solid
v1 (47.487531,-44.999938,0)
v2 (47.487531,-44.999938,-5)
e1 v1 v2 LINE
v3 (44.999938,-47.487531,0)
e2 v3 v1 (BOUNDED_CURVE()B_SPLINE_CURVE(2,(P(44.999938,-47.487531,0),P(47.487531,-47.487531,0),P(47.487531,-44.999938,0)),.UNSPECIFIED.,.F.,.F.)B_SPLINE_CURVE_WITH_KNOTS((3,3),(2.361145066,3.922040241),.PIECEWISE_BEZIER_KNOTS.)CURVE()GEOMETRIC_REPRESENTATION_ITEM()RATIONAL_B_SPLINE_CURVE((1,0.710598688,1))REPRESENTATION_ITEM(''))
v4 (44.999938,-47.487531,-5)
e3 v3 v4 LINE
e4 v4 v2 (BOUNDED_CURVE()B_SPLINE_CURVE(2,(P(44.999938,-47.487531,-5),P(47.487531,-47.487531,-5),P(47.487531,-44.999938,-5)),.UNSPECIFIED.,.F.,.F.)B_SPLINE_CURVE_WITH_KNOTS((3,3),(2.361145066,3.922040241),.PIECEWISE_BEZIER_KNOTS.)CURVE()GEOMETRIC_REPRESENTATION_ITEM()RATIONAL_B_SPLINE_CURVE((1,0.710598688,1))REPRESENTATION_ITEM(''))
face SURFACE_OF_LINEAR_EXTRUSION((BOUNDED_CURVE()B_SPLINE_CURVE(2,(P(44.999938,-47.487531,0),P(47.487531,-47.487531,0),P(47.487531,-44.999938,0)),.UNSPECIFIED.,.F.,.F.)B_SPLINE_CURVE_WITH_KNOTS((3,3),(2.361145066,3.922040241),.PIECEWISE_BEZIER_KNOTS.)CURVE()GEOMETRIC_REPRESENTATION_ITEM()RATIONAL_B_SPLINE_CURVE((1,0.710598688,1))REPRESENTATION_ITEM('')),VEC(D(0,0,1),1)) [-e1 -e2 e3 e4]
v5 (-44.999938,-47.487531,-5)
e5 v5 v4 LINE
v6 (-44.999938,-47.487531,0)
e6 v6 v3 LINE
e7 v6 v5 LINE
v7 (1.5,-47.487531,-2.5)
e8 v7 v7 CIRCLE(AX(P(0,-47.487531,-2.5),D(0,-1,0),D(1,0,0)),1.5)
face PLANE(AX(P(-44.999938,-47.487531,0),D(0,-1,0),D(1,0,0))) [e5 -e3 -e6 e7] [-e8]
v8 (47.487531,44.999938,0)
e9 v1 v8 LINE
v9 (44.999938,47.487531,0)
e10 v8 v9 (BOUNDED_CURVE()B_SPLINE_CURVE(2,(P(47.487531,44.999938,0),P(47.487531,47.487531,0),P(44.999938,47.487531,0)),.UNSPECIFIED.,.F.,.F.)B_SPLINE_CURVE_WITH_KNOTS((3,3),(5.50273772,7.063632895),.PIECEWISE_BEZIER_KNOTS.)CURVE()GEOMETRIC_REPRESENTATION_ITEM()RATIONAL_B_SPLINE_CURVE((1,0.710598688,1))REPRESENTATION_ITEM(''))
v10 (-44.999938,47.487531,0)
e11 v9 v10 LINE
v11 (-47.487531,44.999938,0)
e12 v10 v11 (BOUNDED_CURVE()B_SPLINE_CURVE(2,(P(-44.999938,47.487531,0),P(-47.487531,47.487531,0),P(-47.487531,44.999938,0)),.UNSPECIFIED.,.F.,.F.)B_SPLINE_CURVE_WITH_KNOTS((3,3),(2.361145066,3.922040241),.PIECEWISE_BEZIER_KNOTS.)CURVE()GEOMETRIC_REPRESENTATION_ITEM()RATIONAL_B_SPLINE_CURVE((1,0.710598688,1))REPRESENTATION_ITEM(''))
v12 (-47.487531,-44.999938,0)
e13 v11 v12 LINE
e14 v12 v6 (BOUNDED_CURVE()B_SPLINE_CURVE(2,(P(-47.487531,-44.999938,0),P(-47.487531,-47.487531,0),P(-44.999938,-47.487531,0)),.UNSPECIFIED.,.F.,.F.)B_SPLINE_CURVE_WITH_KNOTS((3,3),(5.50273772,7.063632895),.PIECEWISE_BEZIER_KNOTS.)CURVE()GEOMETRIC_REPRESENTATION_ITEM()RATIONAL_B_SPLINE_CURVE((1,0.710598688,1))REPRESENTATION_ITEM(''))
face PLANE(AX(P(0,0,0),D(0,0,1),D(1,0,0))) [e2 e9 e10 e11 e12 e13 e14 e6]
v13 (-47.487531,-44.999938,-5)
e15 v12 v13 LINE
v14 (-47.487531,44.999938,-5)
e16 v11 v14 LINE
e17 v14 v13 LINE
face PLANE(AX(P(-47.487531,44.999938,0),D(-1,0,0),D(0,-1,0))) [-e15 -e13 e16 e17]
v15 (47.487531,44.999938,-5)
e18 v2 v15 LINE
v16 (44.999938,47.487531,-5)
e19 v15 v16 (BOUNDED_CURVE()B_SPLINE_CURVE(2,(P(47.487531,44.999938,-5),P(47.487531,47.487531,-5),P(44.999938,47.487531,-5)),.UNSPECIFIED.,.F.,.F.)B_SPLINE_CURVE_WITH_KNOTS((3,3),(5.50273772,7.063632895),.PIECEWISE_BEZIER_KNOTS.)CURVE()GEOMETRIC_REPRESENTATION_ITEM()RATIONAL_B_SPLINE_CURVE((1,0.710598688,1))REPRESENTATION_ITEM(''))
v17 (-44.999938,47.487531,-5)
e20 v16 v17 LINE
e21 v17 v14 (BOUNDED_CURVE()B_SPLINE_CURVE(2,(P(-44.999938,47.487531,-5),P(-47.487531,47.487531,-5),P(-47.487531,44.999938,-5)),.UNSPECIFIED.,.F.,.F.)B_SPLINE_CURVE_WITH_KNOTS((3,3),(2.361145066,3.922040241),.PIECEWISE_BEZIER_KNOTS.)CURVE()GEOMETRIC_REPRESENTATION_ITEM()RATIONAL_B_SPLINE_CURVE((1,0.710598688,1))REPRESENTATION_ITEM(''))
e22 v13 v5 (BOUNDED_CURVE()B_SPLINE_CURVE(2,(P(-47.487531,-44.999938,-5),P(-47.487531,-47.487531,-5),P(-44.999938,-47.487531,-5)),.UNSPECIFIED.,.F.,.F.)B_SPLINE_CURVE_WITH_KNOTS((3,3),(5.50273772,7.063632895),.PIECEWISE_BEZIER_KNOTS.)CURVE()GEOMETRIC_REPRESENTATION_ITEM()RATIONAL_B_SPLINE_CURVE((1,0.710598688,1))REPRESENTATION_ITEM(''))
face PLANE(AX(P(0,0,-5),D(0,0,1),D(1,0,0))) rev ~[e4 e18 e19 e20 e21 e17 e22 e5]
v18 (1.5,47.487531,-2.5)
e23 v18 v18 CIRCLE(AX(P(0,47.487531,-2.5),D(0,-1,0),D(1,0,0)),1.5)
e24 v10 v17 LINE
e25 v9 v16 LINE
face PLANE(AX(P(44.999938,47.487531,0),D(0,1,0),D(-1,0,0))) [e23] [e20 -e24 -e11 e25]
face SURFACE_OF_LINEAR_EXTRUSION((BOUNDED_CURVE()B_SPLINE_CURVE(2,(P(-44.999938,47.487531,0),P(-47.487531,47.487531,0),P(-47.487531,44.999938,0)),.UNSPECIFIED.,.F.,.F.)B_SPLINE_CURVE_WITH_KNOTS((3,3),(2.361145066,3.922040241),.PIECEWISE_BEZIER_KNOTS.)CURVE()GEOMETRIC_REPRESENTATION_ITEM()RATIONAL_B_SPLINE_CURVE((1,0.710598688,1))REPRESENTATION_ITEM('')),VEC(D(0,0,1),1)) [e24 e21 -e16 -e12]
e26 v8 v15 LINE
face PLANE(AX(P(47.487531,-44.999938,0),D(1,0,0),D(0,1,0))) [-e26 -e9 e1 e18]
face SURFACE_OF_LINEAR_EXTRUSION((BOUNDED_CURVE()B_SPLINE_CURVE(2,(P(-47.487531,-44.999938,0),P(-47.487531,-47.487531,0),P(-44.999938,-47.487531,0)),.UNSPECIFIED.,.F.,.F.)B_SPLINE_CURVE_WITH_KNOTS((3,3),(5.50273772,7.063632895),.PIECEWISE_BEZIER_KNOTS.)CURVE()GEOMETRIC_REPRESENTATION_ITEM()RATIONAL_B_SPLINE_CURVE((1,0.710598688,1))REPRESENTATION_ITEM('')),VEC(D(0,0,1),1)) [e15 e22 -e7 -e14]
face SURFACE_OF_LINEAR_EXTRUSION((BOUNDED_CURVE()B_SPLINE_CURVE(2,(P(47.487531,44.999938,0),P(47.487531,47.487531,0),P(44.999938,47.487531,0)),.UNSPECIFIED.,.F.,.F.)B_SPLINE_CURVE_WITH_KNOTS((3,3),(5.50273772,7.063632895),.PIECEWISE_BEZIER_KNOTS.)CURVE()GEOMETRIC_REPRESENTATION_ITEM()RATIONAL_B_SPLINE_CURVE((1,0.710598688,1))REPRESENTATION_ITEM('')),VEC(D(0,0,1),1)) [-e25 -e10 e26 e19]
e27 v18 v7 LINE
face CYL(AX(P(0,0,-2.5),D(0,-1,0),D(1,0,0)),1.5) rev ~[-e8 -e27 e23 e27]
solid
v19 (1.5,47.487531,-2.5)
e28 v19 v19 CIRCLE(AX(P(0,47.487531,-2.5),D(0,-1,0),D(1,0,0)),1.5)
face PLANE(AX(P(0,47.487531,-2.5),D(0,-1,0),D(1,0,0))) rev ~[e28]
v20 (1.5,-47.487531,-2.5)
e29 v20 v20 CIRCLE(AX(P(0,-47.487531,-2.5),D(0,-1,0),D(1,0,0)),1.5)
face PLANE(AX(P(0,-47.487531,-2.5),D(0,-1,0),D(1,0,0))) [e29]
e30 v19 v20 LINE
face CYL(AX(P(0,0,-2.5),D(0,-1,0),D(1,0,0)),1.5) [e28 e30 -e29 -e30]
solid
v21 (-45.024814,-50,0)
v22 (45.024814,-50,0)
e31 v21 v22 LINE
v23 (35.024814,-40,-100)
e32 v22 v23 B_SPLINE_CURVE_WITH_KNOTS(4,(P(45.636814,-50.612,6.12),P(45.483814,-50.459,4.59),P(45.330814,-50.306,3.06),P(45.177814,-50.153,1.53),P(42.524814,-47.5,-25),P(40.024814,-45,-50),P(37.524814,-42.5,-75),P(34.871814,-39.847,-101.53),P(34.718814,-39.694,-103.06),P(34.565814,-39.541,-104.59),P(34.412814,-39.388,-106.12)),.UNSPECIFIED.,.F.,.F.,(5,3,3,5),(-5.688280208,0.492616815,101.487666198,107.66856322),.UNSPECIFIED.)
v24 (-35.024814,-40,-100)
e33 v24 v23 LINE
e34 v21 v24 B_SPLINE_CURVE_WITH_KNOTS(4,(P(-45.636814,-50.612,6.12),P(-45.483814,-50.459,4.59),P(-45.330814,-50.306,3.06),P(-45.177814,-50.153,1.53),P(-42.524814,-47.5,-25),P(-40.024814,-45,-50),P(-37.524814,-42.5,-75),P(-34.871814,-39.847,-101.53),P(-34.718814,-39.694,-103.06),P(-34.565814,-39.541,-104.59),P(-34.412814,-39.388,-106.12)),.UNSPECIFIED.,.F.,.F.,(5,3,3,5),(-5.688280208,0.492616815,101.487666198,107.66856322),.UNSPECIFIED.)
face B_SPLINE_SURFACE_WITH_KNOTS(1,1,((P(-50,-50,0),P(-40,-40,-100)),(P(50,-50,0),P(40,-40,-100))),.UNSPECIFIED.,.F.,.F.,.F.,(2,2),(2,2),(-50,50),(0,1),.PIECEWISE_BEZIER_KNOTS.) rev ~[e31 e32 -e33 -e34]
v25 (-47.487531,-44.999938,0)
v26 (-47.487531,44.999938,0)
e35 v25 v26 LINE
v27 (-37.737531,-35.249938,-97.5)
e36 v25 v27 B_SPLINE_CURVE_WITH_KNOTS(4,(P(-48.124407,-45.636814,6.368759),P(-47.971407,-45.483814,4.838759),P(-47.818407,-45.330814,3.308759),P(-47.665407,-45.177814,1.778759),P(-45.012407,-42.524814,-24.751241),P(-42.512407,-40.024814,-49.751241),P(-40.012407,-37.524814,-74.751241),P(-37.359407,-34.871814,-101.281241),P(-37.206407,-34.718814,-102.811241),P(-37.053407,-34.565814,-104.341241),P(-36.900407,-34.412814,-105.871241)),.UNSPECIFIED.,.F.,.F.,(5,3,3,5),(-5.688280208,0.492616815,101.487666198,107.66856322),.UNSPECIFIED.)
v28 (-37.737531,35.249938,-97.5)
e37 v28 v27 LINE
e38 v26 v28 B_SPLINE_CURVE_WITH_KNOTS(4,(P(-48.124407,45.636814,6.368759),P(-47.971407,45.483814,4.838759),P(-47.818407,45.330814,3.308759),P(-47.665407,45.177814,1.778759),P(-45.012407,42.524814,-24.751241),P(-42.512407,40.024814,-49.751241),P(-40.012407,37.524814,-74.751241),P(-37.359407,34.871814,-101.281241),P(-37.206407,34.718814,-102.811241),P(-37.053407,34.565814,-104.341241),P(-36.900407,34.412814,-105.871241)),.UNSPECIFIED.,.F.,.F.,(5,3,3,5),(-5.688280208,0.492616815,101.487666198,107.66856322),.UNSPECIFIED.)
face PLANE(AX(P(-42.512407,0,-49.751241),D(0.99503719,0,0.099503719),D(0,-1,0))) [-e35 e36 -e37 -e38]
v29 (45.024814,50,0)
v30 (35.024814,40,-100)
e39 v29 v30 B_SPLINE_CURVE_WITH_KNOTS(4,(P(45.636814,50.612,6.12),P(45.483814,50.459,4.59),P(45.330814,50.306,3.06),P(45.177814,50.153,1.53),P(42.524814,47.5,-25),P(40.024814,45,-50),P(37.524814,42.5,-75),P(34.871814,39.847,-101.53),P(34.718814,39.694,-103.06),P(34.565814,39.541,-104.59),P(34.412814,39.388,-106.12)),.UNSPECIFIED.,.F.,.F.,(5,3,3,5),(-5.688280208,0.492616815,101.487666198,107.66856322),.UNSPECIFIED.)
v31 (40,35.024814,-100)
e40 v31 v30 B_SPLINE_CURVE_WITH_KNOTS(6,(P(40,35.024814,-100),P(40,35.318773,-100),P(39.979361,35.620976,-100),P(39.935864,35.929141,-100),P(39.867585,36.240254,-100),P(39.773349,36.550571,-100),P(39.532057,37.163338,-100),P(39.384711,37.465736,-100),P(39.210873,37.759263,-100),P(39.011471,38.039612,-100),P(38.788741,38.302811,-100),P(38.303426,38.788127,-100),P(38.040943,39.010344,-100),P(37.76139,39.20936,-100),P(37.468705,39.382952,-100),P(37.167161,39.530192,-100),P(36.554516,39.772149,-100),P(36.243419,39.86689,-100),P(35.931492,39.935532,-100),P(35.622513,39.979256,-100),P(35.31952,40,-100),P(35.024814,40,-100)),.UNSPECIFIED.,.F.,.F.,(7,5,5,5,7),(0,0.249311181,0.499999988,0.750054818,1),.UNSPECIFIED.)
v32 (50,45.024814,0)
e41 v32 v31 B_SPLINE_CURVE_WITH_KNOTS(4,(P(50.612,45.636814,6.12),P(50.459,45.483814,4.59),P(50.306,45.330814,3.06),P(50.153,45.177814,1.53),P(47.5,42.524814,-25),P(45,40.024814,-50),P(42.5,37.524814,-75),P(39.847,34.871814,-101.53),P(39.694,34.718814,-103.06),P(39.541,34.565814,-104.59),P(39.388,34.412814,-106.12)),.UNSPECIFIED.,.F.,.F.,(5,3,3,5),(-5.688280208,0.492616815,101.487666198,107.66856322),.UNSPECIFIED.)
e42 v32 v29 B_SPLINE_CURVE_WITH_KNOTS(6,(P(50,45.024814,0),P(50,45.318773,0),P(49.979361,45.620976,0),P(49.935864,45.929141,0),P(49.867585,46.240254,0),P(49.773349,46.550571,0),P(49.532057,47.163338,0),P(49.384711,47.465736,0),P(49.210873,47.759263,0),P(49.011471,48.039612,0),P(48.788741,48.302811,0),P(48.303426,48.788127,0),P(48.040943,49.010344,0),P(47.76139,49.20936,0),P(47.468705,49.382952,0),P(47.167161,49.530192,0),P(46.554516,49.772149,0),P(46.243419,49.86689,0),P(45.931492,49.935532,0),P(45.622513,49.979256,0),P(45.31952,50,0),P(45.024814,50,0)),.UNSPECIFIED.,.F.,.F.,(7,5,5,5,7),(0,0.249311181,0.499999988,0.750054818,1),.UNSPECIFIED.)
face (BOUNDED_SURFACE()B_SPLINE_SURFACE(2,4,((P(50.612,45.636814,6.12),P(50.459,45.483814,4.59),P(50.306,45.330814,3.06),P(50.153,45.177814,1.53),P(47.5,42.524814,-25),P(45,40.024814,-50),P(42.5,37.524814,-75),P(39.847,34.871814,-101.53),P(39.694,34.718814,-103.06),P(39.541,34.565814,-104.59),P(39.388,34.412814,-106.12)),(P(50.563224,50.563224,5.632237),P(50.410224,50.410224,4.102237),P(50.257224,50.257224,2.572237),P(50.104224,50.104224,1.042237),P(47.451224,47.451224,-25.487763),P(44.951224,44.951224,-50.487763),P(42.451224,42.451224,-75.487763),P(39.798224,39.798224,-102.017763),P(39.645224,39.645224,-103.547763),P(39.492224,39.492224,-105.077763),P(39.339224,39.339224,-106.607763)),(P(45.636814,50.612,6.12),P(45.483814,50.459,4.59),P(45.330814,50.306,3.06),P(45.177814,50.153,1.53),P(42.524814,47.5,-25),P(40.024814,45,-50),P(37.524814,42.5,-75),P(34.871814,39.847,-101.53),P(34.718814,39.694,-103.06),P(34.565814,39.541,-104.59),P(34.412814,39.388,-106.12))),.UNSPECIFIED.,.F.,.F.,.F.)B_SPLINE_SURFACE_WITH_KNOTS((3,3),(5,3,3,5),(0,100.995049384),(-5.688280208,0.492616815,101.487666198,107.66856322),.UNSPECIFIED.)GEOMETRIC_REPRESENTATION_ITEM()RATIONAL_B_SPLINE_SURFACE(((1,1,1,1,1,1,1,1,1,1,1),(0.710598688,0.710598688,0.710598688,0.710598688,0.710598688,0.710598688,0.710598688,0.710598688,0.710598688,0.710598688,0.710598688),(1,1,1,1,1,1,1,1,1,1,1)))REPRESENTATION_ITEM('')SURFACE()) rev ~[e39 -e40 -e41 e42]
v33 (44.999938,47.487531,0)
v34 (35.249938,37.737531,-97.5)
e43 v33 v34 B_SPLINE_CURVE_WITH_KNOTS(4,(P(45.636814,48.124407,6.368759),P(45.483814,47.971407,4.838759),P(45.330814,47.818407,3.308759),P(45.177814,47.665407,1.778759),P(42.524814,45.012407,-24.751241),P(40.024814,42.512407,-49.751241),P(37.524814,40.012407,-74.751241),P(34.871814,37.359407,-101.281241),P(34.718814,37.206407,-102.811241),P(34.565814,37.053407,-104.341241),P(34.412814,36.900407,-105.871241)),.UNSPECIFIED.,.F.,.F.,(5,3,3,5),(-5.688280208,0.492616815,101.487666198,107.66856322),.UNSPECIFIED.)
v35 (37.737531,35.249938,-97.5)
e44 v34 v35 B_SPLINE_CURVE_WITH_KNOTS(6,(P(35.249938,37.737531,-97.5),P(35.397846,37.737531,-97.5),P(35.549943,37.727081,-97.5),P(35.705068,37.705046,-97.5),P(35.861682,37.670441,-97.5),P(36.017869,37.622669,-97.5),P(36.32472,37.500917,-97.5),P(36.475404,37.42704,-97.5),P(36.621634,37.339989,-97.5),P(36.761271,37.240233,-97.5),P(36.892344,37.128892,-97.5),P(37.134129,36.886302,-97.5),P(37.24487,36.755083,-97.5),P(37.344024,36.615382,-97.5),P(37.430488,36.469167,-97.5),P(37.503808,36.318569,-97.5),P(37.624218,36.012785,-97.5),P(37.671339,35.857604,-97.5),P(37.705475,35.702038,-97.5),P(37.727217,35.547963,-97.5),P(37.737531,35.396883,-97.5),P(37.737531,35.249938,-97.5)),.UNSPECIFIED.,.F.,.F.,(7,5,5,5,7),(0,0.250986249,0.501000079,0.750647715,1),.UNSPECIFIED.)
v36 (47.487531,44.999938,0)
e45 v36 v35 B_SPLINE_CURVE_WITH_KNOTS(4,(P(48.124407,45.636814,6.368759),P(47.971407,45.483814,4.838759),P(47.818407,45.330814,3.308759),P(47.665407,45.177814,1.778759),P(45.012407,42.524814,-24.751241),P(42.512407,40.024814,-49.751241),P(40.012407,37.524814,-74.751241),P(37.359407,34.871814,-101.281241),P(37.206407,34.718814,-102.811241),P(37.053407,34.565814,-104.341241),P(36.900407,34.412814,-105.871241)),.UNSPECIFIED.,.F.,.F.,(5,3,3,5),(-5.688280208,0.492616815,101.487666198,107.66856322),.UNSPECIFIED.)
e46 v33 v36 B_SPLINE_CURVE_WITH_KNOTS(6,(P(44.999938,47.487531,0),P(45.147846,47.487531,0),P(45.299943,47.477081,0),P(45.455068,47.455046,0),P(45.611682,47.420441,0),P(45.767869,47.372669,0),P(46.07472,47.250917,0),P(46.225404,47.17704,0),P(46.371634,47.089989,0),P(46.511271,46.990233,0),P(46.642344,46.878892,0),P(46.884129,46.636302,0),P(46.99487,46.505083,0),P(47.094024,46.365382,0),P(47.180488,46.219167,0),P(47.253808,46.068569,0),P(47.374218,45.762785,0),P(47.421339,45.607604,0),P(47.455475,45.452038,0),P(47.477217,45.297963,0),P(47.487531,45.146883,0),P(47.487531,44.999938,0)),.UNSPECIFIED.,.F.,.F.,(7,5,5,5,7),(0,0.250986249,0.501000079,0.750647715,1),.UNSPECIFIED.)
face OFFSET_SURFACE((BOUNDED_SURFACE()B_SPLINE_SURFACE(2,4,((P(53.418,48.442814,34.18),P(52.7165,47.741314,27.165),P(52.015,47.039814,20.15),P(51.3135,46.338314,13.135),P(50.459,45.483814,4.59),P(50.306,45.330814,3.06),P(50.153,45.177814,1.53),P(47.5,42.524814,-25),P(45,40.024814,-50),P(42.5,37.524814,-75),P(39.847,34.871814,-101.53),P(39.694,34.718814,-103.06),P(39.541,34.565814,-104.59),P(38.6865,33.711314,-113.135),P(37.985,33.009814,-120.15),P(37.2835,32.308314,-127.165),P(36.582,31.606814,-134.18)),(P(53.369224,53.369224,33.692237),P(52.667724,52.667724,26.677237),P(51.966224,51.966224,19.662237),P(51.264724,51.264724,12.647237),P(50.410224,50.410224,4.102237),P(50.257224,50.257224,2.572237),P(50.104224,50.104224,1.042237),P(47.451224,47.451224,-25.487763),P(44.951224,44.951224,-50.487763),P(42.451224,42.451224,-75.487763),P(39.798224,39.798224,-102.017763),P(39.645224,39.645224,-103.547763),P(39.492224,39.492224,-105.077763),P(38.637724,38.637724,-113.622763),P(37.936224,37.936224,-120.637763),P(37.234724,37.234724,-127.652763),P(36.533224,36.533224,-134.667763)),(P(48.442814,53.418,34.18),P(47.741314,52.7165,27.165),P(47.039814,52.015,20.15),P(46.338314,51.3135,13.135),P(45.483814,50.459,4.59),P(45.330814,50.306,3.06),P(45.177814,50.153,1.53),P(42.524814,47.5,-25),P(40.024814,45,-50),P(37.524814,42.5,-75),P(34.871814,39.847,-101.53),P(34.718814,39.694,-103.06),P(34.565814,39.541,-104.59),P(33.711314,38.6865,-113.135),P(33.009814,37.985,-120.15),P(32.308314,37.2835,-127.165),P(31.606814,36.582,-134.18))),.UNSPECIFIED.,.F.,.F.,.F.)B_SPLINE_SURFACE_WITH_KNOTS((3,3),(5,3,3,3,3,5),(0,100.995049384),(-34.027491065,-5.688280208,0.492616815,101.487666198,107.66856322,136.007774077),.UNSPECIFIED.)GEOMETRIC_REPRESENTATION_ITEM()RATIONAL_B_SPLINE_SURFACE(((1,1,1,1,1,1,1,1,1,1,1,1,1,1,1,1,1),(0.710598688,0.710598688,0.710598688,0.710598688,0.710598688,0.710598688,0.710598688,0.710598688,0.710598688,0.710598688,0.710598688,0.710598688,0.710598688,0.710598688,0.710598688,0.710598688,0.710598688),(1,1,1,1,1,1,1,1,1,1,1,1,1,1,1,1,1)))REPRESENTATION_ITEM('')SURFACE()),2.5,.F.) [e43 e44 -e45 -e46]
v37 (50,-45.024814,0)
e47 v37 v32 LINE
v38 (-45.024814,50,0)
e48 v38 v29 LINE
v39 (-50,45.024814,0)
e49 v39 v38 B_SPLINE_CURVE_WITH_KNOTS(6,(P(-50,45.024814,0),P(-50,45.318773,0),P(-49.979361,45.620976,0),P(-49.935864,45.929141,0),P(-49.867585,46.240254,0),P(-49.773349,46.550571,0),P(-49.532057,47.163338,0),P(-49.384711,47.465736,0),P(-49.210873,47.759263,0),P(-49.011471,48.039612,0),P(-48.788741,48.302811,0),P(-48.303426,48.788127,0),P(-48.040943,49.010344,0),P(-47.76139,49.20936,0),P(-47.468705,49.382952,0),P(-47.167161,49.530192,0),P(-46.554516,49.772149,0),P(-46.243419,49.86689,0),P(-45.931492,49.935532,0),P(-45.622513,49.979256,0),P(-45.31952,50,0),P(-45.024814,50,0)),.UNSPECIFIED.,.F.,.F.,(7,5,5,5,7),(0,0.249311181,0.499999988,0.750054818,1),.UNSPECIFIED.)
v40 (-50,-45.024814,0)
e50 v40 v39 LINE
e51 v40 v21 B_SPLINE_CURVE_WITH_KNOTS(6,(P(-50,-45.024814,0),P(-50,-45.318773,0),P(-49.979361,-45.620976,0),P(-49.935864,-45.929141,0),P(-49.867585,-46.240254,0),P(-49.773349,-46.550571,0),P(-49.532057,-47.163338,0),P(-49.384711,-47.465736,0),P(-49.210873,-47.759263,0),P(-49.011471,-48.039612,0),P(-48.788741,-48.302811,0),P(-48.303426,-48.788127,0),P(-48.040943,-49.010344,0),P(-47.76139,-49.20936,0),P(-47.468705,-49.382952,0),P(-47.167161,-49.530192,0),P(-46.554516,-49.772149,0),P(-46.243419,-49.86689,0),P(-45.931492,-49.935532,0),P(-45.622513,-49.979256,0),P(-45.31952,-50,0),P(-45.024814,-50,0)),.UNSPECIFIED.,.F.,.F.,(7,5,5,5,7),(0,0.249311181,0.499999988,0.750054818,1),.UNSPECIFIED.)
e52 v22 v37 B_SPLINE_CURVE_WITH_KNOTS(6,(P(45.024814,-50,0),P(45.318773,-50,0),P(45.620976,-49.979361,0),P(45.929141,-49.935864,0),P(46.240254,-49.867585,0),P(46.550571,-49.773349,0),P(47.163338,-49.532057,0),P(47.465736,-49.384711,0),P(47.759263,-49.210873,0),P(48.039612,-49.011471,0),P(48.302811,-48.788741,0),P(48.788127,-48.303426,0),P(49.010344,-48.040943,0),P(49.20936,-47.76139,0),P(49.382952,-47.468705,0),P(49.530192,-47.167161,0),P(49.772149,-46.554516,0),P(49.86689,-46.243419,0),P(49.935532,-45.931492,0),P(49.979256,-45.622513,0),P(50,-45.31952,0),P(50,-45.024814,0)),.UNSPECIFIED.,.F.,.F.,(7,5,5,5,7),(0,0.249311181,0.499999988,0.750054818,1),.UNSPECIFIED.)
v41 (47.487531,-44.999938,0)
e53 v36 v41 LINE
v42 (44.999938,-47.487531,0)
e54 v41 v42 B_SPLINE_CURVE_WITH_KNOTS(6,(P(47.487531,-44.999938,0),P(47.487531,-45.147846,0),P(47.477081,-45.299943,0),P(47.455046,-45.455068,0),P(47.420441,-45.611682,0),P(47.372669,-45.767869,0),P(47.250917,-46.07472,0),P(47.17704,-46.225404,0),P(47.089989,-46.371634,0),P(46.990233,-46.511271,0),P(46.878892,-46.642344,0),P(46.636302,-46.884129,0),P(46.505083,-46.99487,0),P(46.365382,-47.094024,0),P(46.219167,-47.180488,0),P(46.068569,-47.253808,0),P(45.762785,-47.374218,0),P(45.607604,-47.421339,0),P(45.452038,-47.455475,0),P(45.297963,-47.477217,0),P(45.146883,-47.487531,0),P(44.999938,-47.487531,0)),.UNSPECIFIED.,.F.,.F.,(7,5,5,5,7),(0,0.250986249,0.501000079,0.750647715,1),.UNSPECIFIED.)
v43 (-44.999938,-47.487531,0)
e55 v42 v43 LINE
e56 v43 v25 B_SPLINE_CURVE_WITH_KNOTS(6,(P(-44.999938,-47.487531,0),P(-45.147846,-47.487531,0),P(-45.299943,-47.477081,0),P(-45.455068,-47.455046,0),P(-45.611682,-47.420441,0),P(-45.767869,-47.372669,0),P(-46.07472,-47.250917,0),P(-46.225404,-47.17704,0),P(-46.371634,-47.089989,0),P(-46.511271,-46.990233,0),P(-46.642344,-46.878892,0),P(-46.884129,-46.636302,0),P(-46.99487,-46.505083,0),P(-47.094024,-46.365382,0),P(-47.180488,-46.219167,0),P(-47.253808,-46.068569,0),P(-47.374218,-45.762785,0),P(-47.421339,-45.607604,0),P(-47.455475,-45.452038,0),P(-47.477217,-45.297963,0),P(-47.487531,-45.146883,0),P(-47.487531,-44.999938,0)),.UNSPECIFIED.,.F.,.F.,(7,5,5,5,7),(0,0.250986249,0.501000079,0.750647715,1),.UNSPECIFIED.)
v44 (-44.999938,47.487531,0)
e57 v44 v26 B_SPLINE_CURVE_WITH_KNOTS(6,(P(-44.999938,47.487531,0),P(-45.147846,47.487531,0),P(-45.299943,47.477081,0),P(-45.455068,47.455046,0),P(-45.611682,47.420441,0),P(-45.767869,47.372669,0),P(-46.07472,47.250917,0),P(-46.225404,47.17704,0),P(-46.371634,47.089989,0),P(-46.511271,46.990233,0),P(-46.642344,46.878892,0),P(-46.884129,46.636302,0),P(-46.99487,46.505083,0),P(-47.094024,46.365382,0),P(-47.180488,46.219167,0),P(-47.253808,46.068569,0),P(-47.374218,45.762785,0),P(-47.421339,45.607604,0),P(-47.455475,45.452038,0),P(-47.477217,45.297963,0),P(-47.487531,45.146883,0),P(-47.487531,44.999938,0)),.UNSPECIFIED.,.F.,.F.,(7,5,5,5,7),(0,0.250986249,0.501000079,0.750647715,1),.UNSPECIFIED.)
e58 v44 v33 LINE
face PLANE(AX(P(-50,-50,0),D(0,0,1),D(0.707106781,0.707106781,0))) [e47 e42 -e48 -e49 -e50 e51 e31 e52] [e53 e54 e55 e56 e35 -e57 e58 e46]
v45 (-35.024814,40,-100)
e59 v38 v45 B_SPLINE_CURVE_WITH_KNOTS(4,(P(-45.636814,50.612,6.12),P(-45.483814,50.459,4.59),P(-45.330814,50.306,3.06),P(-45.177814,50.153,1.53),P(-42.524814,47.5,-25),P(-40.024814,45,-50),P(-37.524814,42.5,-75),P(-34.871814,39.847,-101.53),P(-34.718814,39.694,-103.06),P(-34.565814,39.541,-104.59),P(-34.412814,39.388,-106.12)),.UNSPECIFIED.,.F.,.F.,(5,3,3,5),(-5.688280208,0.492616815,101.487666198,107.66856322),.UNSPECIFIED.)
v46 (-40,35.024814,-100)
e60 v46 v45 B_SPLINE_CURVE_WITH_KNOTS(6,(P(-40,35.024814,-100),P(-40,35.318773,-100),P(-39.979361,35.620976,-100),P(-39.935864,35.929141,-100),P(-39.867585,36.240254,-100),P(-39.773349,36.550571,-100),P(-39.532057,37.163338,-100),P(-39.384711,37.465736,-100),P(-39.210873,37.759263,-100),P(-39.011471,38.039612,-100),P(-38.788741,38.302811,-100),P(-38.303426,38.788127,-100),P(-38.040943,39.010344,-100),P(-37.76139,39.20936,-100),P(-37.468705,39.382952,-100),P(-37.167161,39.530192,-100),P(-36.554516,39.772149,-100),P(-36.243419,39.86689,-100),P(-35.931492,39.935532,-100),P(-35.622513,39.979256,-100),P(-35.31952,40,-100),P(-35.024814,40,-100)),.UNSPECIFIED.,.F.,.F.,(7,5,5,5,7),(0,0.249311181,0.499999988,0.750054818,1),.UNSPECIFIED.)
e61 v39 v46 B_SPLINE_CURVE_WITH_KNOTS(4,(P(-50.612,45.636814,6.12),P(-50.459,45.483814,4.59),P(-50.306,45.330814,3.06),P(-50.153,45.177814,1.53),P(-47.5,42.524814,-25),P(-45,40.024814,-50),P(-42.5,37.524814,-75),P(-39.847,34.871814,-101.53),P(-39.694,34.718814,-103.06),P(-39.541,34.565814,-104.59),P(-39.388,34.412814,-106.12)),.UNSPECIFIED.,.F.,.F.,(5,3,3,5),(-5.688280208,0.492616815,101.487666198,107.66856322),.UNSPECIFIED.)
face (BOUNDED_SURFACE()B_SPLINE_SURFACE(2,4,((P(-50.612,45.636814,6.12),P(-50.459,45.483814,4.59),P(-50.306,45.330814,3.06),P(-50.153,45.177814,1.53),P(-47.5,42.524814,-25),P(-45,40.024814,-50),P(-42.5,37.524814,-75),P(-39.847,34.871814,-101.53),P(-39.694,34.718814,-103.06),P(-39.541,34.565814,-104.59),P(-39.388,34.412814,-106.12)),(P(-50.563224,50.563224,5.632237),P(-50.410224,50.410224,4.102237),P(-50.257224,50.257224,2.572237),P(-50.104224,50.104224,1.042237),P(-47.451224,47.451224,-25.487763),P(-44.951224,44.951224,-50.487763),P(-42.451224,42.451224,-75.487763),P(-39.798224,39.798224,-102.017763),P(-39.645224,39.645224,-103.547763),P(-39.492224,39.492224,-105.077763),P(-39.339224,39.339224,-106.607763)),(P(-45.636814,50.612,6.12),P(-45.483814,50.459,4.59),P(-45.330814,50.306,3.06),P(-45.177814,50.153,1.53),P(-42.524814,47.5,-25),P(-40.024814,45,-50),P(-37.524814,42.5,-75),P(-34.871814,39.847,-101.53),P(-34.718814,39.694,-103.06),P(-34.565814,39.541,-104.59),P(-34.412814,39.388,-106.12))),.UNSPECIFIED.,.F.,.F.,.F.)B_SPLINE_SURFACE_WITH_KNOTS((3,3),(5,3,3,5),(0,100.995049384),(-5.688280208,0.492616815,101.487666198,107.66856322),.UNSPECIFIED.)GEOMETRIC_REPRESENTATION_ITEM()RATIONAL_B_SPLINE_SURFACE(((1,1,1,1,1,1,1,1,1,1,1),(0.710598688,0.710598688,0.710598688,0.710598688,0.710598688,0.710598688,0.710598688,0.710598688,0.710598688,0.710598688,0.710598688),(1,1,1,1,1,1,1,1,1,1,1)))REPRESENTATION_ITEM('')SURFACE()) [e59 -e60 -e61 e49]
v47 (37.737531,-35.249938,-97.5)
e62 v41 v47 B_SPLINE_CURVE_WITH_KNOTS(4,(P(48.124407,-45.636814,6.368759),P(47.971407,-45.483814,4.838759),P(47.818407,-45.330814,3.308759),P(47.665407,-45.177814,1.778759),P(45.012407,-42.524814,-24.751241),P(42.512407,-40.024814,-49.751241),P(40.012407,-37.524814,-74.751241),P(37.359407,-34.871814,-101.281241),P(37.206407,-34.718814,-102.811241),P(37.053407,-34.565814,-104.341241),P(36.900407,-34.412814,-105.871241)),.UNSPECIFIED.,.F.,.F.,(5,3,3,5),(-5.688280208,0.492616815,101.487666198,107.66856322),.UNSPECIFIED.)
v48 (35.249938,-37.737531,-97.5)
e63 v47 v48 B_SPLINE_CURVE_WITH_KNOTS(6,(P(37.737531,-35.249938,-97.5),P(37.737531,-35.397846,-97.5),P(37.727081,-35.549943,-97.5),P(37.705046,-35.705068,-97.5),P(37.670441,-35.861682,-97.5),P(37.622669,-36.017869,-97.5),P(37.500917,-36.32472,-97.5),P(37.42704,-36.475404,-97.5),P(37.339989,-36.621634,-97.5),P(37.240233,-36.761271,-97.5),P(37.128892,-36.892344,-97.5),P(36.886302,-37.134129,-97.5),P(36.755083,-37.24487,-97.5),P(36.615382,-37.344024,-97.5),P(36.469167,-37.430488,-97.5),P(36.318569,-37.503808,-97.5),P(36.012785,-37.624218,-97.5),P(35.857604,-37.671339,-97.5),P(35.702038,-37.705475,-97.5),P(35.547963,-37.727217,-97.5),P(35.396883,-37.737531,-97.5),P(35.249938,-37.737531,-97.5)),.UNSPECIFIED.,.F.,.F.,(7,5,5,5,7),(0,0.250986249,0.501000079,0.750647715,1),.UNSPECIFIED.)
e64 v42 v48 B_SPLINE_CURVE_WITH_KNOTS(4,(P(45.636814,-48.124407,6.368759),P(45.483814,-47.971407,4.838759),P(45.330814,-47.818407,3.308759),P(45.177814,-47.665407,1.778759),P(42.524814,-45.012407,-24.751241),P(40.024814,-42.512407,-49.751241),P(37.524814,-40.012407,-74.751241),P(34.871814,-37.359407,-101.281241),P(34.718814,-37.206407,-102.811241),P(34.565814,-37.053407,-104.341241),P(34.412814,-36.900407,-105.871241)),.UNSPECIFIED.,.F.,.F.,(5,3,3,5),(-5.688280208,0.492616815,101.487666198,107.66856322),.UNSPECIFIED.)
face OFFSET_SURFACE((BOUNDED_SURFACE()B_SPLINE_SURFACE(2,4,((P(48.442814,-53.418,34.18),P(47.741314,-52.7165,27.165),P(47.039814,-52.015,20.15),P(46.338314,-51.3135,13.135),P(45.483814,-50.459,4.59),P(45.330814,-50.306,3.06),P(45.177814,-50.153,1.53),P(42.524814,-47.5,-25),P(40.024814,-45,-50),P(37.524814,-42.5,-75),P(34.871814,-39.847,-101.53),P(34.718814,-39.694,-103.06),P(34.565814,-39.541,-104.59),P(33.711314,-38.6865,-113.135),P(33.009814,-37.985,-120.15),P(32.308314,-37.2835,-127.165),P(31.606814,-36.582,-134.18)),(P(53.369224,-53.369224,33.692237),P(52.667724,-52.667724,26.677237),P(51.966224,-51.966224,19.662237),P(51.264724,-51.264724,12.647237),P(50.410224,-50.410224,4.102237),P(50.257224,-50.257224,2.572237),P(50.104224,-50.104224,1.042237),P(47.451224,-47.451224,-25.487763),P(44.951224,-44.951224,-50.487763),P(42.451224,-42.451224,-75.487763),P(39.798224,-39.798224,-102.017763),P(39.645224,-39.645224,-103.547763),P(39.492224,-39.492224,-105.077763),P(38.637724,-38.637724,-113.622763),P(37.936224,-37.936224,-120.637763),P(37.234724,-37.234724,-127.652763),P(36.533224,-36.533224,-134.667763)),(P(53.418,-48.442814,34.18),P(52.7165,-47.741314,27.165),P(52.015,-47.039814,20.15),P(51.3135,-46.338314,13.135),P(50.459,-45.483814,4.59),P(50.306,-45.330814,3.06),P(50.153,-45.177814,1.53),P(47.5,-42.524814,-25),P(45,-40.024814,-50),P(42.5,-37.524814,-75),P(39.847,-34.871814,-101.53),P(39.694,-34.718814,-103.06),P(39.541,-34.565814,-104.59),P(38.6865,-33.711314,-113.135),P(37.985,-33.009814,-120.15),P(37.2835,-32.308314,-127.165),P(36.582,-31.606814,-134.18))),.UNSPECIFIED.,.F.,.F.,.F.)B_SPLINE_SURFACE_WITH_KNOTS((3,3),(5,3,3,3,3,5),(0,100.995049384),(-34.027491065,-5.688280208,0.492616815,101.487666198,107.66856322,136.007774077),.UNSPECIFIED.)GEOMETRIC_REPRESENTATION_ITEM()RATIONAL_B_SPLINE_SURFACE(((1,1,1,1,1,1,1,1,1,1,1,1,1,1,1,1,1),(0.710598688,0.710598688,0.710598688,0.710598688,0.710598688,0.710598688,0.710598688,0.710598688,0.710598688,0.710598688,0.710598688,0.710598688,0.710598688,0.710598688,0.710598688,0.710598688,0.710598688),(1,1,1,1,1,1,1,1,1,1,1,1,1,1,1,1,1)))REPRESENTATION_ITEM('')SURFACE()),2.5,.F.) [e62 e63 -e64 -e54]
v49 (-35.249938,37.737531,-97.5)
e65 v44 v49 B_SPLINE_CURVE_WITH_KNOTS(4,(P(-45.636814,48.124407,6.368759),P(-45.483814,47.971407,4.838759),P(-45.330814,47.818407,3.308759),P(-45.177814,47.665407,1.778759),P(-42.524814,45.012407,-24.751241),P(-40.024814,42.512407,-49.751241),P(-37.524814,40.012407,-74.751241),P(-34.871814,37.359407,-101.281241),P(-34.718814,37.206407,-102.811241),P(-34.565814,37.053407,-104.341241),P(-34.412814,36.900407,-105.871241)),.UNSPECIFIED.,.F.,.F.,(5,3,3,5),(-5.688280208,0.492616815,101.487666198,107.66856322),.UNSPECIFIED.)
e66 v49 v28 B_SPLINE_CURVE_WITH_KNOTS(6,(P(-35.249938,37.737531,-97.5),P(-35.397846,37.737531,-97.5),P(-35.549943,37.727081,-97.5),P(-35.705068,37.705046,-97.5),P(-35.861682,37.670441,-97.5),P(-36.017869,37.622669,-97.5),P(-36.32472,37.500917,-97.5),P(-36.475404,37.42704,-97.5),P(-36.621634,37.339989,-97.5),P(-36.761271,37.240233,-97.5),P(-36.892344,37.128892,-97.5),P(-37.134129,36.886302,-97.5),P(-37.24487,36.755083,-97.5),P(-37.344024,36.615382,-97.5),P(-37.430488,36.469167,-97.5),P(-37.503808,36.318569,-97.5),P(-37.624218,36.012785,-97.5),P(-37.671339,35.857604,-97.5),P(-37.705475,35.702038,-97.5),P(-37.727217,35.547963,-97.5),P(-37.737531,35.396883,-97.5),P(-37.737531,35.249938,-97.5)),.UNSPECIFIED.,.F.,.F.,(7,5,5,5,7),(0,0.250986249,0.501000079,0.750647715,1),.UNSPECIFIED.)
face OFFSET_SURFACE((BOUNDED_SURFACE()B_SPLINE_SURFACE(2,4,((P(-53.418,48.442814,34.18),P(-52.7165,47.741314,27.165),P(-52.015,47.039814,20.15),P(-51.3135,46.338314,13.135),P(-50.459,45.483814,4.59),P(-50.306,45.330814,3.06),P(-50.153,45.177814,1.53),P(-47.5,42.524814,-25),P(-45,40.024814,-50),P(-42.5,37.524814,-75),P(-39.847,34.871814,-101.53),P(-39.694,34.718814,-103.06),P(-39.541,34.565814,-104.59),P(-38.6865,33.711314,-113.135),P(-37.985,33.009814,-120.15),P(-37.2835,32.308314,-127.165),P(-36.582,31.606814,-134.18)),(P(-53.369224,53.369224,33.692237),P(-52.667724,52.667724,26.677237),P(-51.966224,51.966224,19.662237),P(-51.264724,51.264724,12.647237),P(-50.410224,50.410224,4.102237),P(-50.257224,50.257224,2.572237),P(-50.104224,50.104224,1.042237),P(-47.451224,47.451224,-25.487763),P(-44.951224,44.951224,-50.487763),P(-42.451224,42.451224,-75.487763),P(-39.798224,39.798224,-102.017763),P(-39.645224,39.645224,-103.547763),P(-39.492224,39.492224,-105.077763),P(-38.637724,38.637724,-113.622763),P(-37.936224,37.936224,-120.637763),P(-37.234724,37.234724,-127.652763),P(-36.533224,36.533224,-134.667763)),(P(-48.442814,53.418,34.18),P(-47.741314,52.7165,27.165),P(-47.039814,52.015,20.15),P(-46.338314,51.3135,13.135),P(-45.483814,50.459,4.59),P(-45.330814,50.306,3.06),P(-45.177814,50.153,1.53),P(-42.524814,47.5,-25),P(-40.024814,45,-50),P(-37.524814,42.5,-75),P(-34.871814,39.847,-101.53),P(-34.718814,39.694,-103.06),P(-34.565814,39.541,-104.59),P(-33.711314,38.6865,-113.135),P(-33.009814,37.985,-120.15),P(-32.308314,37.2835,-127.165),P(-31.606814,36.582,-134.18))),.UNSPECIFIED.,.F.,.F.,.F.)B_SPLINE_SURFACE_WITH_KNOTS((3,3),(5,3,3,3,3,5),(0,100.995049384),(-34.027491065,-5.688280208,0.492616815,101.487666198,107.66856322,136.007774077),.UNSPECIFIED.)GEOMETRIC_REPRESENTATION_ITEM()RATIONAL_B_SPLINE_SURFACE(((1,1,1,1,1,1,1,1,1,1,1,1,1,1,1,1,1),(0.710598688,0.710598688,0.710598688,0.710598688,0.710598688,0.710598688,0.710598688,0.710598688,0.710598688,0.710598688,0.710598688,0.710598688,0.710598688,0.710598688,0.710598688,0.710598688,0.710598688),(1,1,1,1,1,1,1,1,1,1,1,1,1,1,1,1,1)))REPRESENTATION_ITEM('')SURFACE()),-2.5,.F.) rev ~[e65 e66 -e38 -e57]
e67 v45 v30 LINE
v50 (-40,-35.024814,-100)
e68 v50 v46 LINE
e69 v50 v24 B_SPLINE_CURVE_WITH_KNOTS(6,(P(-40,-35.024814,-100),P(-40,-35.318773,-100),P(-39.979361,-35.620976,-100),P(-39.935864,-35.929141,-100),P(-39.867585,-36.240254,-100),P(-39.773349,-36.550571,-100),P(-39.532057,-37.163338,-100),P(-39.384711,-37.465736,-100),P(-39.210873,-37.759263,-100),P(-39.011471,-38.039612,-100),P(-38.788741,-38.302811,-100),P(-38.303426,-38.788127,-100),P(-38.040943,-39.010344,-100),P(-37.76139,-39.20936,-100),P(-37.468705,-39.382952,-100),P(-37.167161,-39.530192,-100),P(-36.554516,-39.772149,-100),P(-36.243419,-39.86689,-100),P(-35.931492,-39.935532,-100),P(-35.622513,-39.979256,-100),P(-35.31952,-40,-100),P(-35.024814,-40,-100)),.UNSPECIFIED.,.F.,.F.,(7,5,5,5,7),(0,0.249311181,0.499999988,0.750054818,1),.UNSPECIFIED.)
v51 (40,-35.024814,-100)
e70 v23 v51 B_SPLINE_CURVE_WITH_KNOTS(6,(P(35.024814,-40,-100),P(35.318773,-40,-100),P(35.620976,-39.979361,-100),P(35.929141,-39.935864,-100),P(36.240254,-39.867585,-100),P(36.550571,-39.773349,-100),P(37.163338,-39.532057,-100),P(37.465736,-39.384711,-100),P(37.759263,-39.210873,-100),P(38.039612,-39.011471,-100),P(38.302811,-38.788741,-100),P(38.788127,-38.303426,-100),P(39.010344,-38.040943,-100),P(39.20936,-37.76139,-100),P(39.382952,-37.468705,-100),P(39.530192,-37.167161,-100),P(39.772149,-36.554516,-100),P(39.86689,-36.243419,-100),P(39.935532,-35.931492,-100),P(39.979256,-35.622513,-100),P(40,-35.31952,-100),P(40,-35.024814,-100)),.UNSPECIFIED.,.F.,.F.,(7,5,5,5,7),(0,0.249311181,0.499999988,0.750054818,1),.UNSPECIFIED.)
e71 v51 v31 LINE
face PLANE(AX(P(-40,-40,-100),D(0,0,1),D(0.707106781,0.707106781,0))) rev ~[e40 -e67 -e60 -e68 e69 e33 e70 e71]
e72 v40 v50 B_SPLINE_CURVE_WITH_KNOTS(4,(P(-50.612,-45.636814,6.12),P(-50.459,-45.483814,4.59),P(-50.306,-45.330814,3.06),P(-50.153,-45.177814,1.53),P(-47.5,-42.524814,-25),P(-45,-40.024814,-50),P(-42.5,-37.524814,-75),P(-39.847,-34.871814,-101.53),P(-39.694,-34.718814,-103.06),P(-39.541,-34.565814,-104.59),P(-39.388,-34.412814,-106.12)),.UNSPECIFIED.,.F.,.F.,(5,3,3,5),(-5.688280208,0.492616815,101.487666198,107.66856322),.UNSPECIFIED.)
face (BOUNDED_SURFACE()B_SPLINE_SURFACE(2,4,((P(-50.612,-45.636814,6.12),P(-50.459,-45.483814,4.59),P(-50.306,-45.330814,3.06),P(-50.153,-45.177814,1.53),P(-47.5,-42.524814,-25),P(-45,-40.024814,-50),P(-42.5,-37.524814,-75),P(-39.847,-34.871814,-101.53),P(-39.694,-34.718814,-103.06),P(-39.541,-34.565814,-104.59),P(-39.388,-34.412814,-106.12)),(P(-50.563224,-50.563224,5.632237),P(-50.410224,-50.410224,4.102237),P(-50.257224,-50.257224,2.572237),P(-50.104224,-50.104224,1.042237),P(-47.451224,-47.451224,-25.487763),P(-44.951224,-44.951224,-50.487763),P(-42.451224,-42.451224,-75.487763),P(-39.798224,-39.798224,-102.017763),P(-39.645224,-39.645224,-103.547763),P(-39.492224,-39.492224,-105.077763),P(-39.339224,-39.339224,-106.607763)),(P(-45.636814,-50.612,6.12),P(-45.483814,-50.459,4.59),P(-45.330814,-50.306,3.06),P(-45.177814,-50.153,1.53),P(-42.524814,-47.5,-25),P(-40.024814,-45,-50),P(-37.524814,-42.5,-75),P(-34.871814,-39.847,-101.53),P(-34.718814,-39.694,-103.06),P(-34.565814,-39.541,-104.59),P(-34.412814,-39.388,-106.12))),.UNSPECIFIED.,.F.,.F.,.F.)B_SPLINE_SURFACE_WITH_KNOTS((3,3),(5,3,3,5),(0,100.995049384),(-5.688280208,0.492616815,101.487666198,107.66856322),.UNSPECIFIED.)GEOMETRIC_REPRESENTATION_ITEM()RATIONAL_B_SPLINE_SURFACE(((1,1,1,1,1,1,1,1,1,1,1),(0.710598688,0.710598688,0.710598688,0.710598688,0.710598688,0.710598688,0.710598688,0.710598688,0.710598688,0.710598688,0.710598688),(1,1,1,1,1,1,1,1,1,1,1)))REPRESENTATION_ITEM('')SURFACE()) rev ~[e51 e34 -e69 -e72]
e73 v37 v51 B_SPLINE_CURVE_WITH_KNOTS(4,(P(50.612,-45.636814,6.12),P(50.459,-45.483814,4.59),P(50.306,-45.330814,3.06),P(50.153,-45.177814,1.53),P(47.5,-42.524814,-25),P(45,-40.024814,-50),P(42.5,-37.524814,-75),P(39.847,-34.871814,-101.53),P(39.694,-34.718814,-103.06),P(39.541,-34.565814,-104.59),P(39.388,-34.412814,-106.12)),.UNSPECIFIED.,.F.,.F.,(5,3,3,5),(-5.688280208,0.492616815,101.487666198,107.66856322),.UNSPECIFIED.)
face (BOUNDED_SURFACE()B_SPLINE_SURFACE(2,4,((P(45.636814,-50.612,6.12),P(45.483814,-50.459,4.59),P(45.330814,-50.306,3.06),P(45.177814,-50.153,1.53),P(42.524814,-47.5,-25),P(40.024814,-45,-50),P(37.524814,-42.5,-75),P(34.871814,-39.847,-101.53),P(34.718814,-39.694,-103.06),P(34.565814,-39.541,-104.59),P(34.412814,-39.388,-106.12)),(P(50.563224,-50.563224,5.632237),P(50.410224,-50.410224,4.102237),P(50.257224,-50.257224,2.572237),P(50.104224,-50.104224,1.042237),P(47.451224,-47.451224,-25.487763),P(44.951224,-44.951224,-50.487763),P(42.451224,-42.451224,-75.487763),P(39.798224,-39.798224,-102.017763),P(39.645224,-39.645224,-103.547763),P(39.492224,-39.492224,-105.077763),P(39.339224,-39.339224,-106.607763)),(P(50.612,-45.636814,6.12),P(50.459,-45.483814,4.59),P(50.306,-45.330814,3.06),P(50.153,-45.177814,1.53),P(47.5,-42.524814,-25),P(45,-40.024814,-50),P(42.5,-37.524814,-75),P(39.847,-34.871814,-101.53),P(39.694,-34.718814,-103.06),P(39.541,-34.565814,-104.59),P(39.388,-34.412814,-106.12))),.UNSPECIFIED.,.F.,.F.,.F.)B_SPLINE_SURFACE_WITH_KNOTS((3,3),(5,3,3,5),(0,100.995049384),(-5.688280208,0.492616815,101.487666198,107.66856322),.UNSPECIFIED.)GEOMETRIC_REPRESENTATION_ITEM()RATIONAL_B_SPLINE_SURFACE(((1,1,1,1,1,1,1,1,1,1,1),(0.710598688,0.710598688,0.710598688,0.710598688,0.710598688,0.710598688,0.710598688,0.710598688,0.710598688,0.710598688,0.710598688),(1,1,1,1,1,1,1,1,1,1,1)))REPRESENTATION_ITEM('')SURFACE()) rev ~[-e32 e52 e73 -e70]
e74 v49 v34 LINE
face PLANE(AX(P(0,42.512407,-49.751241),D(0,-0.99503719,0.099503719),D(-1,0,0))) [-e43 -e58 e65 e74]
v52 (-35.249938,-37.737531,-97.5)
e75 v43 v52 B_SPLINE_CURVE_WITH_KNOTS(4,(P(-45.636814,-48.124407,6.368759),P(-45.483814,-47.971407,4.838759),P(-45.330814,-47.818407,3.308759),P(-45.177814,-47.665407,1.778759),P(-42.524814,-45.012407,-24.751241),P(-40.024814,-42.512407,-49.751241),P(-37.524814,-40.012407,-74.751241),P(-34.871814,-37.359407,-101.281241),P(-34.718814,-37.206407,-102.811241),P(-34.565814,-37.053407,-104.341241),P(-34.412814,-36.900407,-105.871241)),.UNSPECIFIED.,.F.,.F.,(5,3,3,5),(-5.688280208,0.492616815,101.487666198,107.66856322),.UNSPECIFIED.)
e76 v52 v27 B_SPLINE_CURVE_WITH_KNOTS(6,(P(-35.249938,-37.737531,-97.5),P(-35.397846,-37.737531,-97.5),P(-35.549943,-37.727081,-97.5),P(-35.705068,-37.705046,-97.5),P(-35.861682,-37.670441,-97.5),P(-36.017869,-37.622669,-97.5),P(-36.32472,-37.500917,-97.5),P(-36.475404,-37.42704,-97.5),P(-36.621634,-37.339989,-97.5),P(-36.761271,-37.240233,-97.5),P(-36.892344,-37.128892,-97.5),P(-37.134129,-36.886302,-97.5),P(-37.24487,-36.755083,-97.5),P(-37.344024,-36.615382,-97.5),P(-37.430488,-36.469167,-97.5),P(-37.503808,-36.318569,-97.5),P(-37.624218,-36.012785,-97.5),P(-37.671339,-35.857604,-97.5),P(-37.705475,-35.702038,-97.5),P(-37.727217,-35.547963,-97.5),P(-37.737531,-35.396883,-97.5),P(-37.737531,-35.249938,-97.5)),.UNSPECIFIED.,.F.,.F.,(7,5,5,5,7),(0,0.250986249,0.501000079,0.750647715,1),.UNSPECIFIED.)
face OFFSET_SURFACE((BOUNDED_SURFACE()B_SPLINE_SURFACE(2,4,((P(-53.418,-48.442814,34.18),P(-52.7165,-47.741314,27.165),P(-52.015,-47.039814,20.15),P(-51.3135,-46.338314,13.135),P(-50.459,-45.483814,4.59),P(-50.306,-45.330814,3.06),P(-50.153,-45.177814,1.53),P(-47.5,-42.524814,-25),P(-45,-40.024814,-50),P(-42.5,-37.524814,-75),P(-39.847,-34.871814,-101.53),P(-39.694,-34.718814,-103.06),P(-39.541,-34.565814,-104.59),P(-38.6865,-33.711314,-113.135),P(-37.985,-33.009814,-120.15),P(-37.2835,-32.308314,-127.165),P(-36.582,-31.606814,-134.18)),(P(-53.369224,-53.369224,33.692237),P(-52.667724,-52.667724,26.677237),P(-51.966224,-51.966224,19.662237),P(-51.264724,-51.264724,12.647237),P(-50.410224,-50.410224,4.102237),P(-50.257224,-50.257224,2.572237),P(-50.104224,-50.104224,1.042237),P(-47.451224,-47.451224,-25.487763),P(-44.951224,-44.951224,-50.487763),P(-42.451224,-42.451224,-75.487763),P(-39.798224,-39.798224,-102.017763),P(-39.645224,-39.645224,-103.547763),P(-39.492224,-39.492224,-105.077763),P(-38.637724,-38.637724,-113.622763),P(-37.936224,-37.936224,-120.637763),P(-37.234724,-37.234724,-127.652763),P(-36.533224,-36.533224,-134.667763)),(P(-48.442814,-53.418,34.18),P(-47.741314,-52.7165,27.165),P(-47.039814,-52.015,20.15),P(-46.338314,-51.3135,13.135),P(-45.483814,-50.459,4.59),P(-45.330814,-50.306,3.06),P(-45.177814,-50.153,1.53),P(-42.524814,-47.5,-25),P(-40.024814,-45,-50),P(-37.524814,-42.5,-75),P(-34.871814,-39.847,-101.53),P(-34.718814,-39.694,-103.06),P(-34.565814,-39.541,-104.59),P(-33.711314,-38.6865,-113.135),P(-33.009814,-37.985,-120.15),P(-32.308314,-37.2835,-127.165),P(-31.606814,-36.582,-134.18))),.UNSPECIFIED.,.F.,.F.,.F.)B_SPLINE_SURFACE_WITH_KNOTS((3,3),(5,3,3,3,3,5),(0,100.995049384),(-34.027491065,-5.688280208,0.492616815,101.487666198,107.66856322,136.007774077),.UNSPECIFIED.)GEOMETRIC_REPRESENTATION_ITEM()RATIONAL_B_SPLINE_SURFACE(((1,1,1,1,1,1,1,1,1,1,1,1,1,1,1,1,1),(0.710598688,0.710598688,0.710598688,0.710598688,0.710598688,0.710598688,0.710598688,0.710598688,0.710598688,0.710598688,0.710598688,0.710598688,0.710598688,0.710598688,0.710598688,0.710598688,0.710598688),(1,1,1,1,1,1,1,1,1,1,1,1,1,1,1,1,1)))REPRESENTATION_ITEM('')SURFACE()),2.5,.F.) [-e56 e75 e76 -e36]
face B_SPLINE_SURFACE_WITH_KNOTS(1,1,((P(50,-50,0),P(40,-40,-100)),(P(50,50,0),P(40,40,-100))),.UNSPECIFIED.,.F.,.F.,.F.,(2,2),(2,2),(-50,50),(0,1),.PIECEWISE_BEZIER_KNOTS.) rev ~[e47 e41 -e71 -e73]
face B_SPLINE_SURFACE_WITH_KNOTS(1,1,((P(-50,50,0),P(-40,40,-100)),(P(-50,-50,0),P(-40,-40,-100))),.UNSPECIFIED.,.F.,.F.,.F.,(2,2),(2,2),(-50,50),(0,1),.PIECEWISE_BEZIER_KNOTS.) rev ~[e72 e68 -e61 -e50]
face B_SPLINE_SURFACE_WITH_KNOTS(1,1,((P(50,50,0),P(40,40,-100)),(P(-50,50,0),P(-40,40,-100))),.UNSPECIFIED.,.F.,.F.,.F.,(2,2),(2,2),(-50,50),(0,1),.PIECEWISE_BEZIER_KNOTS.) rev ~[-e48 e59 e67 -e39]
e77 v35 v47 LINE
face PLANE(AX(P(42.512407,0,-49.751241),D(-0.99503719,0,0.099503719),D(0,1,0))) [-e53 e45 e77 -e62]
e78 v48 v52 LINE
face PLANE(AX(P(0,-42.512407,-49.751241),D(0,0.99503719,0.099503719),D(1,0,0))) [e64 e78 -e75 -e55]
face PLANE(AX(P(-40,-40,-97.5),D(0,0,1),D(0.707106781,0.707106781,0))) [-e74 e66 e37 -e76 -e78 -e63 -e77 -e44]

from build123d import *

# Parameters (mm, degrees)
F0_W      = 100
F0_H      = 100
F2_W      = 80
F2_H      = 80
F4_R      = 5
F5_T      = -2.5
F7_DEPTH  = 5
F8_R      = 1.5
F9_DEPTH  = 65.6
F10_DEPTH = 47.4875310947
F11_DEPTH = 47.4875310947


with BuildPart() as f3:
    # F0 (on Top) → F3 section 0
    with BuildSketch(Plane.XY):
        Rectangle(F0_W, F0_H)
    # F2 (on offset) → F3 section 1
    with BuildSketch(Plane.XY.offset(-100)):
        Rectangle(F2_W, F2_H)
    loft()

    # F4
    f4_edges = [f3.edges().sort_by_distance(p)[0] for p in [
        (45, 45, -50),
        (-45, 45, -50),
        (-45, -45, -50),
        (45, -45, -50),
    ]]
    fillet(f4_edges, radius=F4_R)

    # F5
    f5_openings = [f3.faces().sort_by_distance(p)[0] for p in [
        (0, 0, 0),
    ]]
    offset(amount=F5_T, openings=f5_openings, kind=Kind.INTERSECTION)


with BuildPart() as f7:
    # F6 (on Top) → F7 (new body)
    with BuildSketch(Plane.XY):
        with BuildLine():
            Line((-47.4875310947, 44.9999381192), (-47.4875310947, -44.9999381192))
            add(Edge.make_bspline(
                [(-47.4875310947, -44.9999381192), (-47.4875310947, -47.4875310947), (-44.9999381192, -47.4875310947)],
                knots=[5.5027377197, 5.5027377197, 5.5027377197, 7.0636328946, 7.0636328946, 7.0636328946], degree=2, weights=[1, 0.7105986878, 1]))
            Line((-44.9999381192, -47.4875310947), (44.9999381192, -47.4875310947))
            add(Edge.make_bspline(
                [(44.9999381192, -47.4875310947), (47.4875310947, -47.4875310947), (47.4875310947, -44.9999381192)],
                knots=[2.3611450661, 2.3611450661, 2.3611450661, 3.9220402411, 3.9220402411, 3.9220402411], degree=2, weights=[1, 0.7105986878, 1]))
            Line((47.4875310947, -44.9999381192), (47.4875310947, 44.9999381192))
            add(Edge.make_bspline(
                [(47.4875310947, 44.9999381192), (47.4875310947, 47.4875310947), (44.9999381192, 47.4875310947)],
                knots=[5.5027377197, 5.5027377197, 5.5027377197, 7.0636328946, 7.0636328946, 7.0636328946], degree=2, weights=[1, 0.7105986878, 1]))
            Line((44.9999381192, 47.4875310947), (-44.9999381192, 47.4875310947))
            add(Edge.make_bspline(
                [(-44.9999381192, 47.4875310947), (-47.4875310947, 47.4875310947), (-47.4875310947, 44.9999381192)],
                knots=[2.3611450661, 2.3611450661, 2.3611450661, 3.9220402411, 3.9220402411, 3.9220402411], degree=2, weights=[1, 0.7105986878, 1]))
        make_face()
    extrude(amount=-F7_DEPTH)

    # F8 (on Front) → F9 (cut, symmetric)
    with BuildSketch(Plane.XZ):
        with Locations((0, -2.5)):
            Circle(F8_R)
    extrude(amount=F9_DEPTH, both=True, mode=Mode.SUBTRACT)


with BuildPart() as f10:
    # F8 (on Front) → F10 (new body, through all)
    with BuildSketch(Plane.XZ):
        with Locations((0, -2.5)):
            Circle(F8_R)
    extrude(amount=F10_DEPTH)

    # F8 (on Front) → F11 (join, through all)
    with BuildSketch(Plane.XZ):
        with Locations((0, -2.5)):
            Circle(F8_R)
    extrude(amount=-F11_DEPTH)


solid = Compound([f3.part, f7.part, f10.part])
